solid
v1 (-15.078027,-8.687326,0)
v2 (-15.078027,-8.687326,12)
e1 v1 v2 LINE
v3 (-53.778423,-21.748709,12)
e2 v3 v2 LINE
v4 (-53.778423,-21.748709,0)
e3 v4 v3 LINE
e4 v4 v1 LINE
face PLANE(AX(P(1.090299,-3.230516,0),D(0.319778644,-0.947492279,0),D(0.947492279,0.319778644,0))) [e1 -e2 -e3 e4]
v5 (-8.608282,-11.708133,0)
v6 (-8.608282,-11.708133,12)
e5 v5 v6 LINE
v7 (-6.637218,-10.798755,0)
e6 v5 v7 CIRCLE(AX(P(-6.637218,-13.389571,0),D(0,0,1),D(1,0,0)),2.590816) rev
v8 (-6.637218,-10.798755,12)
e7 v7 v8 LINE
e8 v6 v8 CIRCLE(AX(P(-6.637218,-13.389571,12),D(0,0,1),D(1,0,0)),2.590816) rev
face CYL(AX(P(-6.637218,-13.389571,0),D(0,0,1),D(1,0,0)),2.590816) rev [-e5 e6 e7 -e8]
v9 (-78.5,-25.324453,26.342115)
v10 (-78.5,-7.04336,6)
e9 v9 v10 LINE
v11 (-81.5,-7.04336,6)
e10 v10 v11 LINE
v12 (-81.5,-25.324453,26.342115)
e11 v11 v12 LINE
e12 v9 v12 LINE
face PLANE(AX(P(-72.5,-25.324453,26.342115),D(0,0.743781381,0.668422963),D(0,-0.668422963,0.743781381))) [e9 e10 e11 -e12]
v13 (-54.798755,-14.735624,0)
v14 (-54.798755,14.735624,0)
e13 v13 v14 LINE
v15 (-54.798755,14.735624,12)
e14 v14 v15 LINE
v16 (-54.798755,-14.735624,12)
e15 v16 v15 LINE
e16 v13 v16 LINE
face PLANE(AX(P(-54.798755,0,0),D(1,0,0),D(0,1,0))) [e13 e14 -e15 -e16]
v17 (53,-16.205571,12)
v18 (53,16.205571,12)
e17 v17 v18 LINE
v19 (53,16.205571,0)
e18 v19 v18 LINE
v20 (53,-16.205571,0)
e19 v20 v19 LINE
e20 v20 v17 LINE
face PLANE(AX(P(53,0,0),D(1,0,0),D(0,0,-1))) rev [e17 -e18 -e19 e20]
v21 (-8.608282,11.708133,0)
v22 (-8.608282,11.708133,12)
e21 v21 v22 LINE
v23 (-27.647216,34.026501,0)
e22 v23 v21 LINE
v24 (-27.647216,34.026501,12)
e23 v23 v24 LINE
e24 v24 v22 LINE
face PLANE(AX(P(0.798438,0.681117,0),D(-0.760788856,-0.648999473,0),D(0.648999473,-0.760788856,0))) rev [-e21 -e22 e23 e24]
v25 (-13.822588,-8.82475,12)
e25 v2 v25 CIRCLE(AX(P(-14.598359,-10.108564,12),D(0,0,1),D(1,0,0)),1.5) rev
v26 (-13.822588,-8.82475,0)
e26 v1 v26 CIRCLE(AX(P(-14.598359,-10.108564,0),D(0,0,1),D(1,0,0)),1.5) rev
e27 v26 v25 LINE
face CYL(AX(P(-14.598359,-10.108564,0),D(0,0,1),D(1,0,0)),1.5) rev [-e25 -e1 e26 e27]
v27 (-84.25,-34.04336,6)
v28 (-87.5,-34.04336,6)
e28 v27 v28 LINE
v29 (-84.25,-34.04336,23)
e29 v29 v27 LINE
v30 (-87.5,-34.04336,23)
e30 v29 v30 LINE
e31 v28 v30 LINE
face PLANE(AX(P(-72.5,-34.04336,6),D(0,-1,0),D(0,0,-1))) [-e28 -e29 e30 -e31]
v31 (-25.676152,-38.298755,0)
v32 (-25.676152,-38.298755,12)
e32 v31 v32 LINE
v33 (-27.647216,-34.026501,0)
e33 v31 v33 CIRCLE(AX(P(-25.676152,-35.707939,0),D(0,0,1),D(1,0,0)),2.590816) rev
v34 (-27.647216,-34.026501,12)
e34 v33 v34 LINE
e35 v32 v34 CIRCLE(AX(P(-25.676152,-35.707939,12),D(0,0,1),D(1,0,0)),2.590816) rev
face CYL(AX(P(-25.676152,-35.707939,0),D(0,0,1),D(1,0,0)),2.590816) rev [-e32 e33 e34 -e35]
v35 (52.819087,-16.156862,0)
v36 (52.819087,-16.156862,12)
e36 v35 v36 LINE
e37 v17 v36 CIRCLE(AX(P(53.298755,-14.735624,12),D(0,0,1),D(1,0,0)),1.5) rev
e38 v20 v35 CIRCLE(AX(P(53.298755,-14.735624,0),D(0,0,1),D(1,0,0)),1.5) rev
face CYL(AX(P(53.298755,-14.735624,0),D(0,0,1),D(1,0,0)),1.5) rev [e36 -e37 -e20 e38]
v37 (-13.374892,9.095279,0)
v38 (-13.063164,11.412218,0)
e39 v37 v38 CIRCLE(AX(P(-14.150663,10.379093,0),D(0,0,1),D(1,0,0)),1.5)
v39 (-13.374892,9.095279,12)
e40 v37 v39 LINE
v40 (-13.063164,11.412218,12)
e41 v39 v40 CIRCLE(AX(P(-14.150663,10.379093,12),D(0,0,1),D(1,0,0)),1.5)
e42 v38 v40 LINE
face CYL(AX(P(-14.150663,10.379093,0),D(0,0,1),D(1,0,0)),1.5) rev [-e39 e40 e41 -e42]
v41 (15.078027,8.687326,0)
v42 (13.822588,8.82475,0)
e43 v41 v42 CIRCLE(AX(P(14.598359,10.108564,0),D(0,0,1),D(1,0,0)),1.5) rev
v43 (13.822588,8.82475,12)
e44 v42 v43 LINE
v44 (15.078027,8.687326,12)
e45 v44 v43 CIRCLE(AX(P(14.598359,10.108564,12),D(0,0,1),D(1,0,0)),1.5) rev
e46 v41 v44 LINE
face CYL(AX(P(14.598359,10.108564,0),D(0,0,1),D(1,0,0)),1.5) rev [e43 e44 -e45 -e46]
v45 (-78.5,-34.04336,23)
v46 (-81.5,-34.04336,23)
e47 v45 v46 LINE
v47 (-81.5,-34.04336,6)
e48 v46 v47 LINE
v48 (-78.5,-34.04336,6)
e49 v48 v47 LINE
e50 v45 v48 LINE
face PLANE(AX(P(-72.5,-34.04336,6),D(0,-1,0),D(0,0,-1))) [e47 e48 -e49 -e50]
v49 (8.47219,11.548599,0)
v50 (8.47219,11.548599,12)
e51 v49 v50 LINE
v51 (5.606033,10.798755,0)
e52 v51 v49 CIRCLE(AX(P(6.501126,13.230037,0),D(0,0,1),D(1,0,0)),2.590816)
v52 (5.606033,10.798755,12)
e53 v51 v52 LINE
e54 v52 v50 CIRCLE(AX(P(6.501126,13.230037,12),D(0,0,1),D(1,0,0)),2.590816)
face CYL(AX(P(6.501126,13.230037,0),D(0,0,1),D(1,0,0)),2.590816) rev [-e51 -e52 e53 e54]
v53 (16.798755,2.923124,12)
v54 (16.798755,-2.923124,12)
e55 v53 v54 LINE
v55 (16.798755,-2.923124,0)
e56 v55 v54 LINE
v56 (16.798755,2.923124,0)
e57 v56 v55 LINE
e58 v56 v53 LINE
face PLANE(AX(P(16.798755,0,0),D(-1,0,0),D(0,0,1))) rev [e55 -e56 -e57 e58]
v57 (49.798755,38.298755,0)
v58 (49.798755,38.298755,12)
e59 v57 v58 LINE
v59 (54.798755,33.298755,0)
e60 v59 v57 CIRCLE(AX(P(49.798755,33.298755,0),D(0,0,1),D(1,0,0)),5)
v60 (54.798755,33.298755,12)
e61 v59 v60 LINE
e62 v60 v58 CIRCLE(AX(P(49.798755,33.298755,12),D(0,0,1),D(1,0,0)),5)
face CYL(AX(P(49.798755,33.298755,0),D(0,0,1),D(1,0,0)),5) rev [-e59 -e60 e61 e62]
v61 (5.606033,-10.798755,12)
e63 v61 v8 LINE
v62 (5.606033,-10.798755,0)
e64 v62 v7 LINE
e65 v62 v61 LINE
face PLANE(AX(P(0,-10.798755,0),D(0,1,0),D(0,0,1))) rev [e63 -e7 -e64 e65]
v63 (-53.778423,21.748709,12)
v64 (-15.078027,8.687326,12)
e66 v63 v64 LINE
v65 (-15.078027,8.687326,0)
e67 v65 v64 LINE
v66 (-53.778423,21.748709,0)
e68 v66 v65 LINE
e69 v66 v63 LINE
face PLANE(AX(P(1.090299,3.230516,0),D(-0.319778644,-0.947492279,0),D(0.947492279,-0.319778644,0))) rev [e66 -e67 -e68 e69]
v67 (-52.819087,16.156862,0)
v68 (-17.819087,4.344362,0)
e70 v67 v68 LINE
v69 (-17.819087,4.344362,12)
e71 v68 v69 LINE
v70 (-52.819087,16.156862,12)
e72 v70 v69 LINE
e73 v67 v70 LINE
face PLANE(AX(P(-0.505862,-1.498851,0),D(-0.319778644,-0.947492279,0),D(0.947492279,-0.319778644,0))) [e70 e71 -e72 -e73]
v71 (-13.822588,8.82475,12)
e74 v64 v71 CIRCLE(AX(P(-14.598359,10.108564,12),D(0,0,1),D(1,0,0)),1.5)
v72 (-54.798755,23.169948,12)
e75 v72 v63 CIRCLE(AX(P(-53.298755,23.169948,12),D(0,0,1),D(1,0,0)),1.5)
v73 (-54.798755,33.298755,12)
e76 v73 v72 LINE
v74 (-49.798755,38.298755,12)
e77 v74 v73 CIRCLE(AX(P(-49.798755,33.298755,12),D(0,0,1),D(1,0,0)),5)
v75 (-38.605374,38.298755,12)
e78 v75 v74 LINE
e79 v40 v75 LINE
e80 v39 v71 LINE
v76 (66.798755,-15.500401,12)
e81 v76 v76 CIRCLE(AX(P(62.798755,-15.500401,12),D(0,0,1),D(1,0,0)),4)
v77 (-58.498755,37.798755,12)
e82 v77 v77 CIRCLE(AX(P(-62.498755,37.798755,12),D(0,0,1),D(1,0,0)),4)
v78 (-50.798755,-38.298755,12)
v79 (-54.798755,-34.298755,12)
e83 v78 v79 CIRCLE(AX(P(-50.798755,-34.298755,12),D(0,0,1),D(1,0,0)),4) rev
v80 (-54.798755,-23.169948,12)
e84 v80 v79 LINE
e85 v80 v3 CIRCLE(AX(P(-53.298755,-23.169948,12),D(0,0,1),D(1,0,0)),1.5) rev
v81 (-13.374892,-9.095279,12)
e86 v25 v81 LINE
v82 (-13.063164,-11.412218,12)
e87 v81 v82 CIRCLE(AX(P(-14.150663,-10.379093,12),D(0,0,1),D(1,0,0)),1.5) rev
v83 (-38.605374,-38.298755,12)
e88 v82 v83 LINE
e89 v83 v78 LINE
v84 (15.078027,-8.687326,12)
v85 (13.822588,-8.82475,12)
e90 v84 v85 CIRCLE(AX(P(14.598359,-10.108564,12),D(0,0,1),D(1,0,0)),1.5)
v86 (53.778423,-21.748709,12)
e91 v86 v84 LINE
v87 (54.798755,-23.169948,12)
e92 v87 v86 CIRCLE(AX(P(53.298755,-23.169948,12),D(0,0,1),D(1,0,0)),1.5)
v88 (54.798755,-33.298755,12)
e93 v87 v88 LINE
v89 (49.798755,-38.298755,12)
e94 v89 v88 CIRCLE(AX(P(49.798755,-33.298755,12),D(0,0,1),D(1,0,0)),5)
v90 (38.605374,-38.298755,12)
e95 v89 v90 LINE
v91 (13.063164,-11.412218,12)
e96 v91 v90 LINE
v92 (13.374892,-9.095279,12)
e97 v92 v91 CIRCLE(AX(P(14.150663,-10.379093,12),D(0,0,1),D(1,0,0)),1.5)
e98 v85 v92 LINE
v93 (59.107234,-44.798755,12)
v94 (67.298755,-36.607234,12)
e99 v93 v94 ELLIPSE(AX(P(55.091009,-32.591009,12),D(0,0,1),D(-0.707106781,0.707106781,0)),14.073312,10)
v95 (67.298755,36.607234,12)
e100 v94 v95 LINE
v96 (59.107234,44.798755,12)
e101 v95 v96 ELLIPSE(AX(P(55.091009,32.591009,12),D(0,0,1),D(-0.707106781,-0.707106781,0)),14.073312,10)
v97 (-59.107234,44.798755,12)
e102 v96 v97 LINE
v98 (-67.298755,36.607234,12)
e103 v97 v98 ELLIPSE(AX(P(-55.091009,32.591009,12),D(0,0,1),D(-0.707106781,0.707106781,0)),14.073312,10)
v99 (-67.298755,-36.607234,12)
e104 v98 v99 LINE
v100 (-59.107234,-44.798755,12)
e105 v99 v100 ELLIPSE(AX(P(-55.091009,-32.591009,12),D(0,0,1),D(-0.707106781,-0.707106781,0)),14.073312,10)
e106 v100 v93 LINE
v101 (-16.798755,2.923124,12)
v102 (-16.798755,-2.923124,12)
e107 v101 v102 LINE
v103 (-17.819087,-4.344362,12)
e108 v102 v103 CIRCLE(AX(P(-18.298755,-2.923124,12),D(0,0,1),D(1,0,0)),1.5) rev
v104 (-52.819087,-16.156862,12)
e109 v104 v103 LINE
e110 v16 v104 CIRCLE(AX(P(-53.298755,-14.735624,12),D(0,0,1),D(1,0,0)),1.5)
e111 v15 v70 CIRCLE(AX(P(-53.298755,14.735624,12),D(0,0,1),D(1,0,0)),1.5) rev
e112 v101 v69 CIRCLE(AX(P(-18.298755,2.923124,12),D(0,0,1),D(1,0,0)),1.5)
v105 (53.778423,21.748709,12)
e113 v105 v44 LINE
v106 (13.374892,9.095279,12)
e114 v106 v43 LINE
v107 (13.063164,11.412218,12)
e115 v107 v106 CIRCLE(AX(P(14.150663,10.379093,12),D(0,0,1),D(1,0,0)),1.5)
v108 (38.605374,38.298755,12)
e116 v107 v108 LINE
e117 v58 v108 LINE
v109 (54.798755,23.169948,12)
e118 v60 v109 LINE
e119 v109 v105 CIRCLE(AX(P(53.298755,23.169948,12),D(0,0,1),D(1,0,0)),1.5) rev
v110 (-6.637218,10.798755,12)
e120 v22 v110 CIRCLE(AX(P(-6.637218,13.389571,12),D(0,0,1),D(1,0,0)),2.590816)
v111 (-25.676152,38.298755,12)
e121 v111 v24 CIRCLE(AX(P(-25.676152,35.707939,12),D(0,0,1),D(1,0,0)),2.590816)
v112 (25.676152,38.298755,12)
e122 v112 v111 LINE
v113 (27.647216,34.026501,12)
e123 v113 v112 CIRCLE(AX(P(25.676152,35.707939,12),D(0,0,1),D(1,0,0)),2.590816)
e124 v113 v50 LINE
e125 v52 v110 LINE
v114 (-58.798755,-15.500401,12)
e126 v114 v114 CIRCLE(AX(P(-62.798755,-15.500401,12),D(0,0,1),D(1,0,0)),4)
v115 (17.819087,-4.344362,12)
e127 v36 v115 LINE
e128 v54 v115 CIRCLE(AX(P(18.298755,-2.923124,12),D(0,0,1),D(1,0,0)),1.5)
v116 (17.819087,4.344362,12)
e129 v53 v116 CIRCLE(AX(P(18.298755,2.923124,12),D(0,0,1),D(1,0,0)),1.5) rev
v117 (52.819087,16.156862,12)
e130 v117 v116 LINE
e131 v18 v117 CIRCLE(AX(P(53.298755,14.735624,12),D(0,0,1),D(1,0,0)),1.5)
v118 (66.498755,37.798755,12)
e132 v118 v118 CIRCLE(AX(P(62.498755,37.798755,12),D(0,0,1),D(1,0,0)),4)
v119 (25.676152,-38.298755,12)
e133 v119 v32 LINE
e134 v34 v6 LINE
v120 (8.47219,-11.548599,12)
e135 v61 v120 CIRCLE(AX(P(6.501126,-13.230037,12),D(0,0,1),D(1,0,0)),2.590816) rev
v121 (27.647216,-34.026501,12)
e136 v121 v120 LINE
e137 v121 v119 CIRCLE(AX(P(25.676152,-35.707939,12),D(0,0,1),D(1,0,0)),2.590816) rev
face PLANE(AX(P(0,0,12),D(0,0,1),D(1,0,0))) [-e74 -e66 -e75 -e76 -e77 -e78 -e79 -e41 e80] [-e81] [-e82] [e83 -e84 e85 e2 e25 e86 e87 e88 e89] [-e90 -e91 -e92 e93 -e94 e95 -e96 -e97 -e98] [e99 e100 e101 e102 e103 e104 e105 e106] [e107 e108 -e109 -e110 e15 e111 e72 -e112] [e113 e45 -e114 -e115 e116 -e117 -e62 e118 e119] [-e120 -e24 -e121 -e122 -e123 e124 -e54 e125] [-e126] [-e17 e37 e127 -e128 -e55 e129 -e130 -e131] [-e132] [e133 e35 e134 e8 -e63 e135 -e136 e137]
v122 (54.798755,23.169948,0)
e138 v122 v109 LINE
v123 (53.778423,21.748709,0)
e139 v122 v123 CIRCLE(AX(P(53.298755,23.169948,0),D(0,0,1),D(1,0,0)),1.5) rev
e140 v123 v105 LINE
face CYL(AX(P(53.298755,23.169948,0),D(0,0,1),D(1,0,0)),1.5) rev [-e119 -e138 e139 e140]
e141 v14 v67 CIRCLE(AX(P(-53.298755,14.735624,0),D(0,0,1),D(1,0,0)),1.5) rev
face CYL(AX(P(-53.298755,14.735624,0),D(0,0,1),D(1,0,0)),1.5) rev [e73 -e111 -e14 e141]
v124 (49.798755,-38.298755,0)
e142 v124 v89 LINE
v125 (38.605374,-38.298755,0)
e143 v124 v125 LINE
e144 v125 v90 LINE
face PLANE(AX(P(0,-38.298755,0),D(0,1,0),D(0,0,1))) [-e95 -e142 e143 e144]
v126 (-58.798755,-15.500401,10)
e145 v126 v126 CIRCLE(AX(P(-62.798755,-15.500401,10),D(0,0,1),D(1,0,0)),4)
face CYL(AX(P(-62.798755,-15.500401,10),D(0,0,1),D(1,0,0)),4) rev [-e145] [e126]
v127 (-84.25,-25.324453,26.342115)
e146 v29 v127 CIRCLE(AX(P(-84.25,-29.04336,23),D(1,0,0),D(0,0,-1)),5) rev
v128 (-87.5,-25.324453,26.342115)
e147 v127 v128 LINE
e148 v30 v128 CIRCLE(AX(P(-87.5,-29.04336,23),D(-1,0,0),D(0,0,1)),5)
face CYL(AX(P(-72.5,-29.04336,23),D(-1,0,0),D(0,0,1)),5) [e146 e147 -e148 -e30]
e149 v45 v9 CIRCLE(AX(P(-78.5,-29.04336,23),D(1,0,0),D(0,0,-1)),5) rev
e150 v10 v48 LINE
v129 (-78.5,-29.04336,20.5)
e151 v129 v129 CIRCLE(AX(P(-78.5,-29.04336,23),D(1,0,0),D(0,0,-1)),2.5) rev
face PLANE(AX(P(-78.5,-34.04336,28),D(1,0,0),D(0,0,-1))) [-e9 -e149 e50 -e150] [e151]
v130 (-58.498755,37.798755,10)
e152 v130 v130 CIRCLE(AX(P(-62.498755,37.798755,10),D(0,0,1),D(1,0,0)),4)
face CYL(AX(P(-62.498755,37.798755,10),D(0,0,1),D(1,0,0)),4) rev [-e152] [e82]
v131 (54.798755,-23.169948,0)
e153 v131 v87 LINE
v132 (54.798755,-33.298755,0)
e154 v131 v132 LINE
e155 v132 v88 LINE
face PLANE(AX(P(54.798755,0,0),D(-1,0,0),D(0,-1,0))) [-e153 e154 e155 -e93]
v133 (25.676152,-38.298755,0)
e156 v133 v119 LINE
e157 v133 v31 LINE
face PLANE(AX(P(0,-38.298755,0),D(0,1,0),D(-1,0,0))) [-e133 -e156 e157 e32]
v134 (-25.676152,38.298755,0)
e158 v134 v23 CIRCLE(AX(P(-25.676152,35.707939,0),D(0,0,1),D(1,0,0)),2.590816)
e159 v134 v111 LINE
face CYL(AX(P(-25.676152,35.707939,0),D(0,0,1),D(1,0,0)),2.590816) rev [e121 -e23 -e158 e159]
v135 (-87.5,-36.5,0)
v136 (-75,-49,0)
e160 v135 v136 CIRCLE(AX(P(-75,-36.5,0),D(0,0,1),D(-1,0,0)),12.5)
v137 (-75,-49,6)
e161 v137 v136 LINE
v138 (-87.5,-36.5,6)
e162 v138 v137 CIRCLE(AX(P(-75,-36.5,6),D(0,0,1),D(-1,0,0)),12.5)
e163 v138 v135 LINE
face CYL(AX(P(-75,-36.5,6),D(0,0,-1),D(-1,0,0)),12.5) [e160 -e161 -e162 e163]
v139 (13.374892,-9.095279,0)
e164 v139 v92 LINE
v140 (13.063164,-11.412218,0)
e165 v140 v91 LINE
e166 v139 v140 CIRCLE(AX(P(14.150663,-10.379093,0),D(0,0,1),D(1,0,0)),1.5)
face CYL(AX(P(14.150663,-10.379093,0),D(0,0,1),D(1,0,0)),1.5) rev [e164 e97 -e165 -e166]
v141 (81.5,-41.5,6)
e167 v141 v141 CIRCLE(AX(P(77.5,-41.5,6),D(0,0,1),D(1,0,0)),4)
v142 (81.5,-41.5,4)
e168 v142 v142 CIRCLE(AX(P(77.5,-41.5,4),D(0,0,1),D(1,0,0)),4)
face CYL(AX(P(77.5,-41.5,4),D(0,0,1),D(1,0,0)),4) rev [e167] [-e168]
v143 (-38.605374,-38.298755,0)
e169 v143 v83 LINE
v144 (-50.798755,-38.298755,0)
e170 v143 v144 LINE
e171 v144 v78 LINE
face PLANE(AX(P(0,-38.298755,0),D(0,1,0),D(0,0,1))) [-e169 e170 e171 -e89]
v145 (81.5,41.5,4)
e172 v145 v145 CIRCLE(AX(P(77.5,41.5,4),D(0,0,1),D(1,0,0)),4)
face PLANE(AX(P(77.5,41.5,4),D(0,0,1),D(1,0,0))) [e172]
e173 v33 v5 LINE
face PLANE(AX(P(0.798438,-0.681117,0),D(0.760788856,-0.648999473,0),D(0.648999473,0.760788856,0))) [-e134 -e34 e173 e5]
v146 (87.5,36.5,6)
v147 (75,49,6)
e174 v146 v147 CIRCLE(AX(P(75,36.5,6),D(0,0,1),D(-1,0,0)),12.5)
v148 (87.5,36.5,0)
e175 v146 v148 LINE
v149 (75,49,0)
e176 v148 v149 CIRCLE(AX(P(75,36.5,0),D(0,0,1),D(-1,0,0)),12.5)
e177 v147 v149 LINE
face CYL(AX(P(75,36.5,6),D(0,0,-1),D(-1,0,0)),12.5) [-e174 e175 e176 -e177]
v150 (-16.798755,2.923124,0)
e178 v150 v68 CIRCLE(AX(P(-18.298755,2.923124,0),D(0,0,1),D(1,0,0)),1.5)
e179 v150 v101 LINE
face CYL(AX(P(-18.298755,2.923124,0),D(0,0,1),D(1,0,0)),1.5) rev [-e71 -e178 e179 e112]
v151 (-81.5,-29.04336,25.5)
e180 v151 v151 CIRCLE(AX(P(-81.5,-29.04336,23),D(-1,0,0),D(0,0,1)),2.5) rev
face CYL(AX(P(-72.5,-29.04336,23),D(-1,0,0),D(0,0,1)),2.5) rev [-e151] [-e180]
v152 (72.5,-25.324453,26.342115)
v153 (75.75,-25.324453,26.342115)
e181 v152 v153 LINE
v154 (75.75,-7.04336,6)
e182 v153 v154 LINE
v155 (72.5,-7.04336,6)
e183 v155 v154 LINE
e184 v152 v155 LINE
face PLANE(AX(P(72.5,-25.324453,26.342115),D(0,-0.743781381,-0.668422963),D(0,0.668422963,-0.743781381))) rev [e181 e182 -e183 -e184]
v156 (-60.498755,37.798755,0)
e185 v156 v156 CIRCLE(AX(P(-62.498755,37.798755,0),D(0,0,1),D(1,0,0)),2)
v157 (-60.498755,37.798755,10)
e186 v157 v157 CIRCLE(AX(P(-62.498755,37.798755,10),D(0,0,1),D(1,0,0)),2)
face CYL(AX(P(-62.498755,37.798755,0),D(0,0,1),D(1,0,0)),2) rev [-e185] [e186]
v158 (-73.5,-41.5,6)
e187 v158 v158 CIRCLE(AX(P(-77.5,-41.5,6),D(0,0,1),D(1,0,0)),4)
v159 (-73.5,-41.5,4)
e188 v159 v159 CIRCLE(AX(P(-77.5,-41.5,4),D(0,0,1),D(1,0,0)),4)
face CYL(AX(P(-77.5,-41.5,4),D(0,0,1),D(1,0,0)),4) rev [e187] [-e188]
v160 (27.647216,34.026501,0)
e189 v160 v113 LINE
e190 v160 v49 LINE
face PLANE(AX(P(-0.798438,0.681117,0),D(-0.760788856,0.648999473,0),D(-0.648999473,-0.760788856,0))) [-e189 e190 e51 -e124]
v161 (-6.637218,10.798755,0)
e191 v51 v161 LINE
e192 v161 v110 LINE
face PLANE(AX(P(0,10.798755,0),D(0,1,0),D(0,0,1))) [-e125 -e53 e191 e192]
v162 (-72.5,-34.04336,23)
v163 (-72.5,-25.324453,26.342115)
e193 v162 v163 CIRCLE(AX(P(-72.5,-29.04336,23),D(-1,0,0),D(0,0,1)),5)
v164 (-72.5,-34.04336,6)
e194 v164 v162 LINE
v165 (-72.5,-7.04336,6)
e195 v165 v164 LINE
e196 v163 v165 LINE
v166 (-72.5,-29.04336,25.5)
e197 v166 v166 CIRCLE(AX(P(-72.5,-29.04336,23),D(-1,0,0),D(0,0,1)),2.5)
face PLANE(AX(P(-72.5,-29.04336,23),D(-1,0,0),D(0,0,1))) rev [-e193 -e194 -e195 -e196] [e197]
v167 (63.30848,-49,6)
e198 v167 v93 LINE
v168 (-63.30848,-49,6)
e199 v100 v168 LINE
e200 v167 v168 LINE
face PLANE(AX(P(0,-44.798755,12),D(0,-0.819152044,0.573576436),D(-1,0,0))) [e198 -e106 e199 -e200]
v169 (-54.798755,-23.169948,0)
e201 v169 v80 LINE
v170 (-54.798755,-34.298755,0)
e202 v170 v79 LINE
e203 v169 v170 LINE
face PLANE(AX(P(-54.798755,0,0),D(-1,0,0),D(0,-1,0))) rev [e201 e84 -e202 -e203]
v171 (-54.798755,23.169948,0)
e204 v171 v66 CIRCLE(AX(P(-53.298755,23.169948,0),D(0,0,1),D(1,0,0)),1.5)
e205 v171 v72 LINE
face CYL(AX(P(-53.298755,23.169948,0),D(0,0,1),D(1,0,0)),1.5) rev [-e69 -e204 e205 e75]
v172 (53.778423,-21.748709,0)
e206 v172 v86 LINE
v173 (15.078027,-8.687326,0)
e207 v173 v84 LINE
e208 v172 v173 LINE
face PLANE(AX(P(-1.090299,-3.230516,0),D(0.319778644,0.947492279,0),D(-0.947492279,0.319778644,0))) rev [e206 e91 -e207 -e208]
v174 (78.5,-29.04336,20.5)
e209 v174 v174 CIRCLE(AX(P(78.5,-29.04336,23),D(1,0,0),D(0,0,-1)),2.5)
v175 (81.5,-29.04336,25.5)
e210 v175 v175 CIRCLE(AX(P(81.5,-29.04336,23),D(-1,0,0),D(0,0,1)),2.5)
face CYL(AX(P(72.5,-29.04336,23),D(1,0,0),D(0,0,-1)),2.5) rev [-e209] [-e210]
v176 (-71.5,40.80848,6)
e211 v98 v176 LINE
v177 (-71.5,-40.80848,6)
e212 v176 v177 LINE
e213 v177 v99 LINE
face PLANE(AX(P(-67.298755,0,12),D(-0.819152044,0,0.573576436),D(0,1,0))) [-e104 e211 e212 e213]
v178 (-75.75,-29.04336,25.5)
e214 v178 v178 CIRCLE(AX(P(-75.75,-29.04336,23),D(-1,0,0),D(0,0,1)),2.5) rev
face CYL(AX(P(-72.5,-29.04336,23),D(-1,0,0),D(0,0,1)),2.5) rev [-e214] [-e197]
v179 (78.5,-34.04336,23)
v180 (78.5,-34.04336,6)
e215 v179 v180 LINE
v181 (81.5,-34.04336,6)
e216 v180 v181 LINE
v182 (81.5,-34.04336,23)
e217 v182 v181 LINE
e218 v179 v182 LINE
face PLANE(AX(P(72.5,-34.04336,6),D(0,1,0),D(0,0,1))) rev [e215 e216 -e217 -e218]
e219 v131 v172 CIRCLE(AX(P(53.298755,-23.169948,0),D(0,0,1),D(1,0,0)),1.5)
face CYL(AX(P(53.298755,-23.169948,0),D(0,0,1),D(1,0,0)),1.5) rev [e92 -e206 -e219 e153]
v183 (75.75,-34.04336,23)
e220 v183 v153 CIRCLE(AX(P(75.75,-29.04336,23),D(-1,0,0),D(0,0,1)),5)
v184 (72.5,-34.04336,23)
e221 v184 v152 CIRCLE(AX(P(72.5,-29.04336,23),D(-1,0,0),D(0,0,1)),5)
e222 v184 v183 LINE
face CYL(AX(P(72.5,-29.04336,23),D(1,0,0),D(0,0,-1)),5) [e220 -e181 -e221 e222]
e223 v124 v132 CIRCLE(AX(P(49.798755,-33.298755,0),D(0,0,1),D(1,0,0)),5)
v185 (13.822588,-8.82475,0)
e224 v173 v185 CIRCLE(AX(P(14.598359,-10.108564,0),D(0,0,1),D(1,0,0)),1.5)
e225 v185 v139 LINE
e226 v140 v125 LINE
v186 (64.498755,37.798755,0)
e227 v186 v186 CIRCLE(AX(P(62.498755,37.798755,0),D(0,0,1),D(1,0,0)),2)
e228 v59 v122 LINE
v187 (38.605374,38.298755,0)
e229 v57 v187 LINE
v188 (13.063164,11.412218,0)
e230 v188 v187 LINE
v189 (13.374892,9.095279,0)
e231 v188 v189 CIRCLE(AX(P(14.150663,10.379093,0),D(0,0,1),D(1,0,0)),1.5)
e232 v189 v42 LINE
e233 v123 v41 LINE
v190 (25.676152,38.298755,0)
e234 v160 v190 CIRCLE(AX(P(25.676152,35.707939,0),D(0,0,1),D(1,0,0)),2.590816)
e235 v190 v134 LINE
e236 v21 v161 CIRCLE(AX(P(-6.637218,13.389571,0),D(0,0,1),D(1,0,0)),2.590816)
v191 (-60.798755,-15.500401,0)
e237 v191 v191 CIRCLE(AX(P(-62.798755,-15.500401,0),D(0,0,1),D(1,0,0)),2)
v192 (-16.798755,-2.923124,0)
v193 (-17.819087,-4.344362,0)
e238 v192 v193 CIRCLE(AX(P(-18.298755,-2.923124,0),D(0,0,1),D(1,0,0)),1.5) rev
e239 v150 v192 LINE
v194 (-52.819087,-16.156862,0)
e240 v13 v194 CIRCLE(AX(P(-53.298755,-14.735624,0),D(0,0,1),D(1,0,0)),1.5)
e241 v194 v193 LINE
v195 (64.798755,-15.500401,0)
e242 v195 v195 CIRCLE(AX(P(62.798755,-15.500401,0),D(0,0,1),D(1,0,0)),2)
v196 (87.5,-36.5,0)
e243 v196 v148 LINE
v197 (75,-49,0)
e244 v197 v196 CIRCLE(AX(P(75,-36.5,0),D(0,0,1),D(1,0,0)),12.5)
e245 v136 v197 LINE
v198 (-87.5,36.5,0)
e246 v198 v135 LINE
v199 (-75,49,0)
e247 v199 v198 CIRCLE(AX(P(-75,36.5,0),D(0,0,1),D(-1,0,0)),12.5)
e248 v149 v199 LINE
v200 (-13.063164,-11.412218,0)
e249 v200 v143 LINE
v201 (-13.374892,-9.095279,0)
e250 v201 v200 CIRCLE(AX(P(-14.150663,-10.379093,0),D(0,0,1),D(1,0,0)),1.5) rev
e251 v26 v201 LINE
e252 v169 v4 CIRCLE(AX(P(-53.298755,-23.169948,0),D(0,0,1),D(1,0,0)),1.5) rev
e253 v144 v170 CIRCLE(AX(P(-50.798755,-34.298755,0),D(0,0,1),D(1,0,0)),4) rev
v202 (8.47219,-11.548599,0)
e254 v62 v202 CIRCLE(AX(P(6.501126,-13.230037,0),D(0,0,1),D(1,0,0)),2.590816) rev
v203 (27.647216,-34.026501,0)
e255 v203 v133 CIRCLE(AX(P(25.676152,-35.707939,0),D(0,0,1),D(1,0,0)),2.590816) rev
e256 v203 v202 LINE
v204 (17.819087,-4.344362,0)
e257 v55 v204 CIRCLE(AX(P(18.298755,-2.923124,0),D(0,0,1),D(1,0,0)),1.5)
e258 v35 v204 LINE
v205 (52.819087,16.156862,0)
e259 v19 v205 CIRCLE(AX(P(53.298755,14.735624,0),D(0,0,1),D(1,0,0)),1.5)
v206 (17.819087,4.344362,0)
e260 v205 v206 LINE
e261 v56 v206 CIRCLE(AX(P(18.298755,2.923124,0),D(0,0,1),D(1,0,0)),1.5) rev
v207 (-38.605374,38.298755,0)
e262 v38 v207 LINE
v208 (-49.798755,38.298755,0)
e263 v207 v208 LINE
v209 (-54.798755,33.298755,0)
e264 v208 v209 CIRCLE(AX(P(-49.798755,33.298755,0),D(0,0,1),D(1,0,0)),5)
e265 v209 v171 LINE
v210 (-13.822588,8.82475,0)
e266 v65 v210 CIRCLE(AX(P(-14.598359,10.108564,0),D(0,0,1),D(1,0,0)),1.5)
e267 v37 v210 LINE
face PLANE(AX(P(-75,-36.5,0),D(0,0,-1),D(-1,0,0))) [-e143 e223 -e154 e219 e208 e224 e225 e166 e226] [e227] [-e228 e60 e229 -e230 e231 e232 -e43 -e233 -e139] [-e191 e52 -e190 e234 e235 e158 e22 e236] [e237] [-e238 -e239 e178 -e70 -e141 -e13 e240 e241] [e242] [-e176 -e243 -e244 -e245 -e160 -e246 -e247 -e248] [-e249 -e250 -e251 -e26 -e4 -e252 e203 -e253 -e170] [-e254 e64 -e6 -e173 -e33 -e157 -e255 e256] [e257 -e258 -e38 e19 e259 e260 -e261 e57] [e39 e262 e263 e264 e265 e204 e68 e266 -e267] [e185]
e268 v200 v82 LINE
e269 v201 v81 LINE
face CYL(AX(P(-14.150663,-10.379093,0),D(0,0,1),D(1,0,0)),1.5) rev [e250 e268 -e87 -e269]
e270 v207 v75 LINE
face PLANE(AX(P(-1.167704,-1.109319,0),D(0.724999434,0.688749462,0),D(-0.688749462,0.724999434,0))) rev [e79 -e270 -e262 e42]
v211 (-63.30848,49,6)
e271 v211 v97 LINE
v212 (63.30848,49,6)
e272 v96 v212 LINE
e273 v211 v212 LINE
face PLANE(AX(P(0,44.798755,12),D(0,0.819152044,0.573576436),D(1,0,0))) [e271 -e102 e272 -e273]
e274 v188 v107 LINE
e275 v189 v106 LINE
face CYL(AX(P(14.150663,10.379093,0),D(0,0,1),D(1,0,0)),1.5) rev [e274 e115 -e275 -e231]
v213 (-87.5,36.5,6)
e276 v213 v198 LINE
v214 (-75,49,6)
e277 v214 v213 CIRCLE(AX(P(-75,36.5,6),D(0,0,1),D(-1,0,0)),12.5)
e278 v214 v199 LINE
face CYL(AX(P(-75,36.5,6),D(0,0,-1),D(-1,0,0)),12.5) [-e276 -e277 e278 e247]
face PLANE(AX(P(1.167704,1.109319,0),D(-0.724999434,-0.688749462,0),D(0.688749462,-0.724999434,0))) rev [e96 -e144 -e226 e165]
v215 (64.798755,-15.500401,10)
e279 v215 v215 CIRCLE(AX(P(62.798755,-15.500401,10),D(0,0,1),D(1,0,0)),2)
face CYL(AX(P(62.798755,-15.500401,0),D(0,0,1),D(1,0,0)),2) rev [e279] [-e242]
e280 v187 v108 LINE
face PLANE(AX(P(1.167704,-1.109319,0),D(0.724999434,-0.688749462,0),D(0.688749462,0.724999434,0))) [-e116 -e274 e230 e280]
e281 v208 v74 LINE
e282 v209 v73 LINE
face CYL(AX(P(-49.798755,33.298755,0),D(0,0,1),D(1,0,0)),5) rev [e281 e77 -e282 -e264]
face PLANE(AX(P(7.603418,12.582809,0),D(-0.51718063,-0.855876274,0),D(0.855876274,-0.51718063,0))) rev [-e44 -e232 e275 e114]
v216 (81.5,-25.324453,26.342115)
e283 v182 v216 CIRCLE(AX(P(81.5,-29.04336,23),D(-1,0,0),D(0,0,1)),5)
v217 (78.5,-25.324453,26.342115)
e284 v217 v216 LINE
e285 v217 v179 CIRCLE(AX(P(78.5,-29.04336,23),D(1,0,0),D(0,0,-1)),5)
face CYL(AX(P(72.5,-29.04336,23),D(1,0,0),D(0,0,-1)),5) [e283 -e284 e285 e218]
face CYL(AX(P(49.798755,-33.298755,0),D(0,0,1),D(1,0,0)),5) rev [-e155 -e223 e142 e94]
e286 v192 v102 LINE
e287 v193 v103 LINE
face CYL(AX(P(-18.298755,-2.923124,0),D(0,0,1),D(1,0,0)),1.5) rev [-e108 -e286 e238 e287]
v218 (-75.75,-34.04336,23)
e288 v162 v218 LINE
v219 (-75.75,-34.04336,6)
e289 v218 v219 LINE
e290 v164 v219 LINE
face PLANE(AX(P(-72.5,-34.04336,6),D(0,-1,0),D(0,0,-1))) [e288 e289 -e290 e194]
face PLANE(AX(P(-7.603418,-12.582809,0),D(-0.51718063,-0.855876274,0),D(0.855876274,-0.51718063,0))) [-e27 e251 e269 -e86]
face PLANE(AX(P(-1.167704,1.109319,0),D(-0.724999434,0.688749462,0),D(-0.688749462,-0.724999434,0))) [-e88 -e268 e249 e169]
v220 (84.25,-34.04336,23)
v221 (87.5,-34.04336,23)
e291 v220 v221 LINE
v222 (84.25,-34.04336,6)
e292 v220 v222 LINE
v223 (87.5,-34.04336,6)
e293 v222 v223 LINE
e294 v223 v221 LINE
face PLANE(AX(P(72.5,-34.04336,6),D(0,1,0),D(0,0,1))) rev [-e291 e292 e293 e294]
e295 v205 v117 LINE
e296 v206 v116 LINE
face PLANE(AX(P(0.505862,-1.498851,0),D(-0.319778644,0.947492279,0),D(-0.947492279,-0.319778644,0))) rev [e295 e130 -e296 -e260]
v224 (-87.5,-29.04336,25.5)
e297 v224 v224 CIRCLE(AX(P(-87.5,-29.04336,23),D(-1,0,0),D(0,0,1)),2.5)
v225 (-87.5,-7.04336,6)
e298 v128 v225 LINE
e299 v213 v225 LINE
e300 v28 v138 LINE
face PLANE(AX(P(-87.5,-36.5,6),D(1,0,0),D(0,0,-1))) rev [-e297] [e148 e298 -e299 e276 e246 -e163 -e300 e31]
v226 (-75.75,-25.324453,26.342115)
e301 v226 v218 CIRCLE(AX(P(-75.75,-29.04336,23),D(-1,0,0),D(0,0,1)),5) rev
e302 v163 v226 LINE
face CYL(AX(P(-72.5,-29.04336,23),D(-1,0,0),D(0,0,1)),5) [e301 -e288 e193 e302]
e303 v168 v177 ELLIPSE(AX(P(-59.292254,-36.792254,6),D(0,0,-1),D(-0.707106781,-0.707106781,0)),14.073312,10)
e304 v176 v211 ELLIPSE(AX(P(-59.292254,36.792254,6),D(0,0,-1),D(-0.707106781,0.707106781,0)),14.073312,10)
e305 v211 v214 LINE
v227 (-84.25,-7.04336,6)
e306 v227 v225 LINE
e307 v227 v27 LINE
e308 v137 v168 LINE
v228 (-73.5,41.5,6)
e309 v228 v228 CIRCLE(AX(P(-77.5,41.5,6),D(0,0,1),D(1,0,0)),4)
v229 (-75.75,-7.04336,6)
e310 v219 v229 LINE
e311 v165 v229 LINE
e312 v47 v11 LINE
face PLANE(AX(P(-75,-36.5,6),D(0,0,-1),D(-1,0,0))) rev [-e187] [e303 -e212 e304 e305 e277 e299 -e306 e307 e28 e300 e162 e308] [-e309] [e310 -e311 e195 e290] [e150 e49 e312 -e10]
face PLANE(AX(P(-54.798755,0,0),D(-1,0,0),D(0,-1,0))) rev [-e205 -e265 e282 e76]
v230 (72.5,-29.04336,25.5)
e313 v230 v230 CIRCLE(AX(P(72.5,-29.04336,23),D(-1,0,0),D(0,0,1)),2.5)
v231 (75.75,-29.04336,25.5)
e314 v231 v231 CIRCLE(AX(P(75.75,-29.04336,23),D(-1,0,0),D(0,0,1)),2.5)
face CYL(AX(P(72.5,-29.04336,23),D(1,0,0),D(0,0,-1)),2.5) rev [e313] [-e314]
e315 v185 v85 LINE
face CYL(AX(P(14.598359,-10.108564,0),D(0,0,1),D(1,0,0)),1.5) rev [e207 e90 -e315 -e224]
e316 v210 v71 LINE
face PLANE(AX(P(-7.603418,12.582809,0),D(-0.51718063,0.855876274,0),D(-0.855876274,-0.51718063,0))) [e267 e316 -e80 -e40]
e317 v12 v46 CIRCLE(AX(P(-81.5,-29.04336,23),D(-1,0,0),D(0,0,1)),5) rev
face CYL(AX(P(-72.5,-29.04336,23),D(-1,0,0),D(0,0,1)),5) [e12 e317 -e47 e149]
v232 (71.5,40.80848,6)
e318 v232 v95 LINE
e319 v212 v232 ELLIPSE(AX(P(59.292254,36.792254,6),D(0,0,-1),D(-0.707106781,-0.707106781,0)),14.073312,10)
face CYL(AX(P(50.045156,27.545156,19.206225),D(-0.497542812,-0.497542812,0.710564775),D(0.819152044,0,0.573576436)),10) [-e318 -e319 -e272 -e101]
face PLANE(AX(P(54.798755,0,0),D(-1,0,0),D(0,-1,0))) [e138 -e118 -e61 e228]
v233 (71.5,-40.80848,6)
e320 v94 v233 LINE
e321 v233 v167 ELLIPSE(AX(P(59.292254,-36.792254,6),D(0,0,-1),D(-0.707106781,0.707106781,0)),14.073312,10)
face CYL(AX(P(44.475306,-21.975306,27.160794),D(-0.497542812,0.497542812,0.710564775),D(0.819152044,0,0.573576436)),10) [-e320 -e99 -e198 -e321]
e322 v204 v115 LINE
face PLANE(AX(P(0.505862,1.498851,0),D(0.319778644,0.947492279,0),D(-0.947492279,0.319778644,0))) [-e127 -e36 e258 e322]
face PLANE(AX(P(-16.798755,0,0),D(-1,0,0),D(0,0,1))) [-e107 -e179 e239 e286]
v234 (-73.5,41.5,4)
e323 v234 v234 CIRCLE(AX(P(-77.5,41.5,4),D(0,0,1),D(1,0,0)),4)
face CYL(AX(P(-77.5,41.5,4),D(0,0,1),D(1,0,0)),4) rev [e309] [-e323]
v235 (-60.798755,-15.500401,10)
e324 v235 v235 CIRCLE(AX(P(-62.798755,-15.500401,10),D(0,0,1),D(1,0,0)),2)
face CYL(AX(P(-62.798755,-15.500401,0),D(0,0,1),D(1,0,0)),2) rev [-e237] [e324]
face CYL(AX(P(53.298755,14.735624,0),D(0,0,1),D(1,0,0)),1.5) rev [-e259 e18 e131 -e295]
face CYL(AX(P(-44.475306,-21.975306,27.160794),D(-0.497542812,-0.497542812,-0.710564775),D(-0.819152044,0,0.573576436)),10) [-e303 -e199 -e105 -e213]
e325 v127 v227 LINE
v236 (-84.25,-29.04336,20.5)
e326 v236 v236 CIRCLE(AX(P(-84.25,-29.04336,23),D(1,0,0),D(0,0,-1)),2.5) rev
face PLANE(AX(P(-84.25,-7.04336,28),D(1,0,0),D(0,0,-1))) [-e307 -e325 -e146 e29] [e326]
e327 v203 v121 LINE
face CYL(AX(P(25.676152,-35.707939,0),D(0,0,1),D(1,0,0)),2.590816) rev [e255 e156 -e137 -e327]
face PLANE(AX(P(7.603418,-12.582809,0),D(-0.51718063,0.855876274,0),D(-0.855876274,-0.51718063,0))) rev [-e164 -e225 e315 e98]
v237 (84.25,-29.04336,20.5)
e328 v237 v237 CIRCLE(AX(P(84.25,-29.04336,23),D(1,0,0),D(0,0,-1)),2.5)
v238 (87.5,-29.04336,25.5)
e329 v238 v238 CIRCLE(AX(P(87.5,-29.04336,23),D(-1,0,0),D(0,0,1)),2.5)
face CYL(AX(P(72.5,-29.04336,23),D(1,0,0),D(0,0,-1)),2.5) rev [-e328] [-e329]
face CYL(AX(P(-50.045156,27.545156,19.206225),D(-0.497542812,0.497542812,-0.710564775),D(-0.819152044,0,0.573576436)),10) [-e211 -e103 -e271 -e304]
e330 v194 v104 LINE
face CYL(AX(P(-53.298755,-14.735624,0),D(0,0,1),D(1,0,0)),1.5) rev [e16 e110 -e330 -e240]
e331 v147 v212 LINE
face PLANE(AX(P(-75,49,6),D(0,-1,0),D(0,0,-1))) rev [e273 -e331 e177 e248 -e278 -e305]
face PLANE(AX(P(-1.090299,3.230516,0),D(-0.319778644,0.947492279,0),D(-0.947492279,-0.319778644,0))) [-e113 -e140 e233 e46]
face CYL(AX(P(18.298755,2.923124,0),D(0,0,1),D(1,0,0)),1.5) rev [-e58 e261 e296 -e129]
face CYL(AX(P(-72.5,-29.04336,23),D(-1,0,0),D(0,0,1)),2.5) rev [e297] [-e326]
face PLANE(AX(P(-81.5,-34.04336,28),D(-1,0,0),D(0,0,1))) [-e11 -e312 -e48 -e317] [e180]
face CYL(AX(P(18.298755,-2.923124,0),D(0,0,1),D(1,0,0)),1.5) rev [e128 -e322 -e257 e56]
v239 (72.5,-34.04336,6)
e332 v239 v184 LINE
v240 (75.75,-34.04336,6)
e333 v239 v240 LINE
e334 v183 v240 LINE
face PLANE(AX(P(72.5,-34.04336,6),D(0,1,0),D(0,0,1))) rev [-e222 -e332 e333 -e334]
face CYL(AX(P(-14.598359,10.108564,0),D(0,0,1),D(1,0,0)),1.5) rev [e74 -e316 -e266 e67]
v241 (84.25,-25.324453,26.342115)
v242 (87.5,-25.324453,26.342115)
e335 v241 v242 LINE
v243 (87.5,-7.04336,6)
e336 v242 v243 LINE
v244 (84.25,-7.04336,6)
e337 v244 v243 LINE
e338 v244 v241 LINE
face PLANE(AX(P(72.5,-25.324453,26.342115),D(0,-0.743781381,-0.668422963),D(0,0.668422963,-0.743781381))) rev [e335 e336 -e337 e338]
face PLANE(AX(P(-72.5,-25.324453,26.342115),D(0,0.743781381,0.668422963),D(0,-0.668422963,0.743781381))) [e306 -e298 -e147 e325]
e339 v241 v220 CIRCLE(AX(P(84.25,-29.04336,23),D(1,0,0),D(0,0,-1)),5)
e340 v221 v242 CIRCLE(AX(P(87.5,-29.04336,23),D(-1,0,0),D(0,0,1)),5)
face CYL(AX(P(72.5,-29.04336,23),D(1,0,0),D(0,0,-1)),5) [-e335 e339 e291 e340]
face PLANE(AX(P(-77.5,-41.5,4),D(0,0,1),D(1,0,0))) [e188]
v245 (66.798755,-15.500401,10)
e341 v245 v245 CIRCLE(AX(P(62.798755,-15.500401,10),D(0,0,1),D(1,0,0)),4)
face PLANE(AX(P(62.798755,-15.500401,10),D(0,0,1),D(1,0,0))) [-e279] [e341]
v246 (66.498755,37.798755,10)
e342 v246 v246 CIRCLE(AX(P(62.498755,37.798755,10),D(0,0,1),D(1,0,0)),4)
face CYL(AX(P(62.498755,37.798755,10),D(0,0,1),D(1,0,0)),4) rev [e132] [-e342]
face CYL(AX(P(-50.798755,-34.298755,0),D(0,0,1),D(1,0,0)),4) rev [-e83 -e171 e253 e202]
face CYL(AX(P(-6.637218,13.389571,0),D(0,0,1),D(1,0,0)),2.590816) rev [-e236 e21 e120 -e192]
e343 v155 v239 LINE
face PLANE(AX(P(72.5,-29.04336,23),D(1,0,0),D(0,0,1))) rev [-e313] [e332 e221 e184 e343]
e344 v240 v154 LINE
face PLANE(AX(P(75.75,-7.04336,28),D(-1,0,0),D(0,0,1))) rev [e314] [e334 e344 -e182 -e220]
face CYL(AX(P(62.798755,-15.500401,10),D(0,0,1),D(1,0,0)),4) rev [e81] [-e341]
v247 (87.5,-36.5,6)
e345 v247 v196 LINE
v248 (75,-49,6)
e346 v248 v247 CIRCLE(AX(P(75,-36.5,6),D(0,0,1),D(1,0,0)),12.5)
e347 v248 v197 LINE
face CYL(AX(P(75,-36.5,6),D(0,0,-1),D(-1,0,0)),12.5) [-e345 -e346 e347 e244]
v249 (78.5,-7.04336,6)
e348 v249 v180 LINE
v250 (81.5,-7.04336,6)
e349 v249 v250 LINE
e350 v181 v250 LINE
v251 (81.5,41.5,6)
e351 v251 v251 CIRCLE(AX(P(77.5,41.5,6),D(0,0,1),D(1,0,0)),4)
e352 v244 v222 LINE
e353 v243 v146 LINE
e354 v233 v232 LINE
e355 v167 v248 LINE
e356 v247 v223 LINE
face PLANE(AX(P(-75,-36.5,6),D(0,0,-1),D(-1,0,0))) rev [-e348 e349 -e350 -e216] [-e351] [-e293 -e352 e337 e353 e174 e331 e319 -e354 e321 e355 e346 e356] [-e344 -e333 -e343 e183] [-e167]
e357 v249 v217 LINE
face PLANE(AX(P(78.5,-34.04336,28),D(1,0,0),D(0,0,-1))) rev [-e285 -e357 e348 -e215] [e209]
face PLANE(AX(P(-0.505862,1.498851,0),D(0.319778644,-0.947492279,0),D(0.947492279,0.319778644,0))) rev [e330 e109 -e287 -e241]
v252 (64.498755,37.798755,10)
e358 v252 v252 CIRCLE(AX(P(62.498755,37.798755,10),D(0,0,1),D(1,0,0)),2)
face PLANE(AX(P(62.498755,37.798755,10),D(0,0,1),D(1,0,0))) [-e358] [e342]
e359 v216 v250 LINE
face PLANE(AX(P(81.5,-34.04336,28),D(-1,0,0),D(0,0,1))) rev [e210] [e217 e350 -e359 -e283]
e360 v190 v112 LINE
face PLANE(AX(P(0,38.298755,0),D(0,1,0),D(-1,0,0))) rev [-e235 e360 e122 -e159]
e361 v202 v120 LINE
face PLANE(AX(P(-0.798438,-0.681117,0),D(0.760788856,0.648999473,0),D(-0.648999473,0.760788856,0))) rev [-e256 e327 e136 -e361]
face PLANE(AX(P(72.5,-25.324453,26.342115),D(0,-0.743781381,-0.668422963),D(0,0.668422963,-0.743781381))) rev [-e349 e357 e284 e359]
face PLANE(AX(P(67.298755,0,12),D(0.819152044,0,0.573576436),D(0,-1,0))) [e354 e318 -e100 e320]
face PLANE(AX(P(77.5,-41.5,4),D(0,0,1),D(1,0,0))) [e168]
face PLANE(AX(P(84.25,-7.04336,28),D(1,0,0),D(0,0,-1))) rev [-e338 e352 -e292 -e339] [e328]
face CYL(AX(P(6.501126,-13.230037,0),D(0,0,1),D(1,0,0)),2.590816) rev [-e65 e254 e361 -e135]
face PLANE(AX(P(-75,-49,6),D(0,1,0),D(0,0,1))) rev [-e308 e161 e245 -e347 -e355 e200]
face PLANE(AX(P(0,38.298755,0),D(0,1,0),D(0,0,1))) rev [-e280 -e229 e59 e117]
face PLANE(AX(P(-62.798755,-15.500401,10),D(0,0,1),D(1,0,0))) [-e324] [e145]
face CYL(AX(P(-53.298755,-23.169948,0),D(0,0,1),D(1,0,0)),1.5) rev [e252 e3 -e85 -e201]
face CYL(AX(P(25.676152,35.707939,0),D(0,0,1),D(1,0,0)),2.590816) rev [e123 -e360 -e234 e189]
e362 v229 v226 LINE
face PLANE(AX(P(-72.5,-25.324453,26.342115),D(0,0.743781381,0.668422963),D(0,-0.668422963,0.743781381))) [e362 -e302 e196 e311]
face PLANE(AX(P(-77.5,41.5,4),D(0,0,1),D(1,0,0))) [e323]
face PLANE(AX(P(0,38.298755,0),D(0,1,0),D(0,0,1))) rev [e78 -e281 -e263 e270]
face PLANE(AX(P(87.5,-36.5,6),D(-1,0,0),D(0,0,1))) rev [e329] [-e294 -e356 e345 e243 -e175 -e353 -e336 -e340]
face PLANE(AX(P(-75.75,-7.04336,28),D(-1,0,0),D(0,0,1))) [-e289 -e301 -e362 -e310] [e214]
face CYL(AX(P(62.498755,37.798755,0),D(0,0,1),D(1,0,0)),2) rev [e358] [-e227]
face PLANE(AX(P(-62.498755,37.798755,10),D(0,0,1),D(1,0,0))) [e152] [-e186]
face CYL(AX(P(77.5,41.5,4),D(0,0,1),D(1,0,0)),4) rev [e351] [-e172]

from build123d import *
from OCP.BRepFilletAPI import BRepFilletAPI_MakeChamfer

# Parameters (mm, degrees)
BOSS_EXTRUDE1_DEPTH = 6
SKETCH2_R           = 4
CUT_EXTRUDE1_DEPTH  = 2
SKETCH3_W           = 143
SKETCH3_H           = 98
BOSS_EXTRUDE2_DEPTH = 6
CHAMFER1_SIZE       = 6
CHAMFER1_SIZE_2     = 4.201245229
FILLET1_R           = 10
CUT_EXTRUDE3_DEPTH  = 102.001237616
SKETCH5_R           = 4
CUT_EXTRUDE4_DEPTH  = 2
SKETCH6_R           = 2
CUT_EXTRUDE5_DEPTH  = 101.783183121
SKETCH7_R           = 2.5
BOSS_EXTRUDE3_DEPTH = 15
SKETCH8_W           = 2.75
SKETCH8_H           = 27
CUT_EXTRUDE7_DEPTH  = 103.670589752


# Some blends are built 0.0001 mm under size
with BuildPart() as part:
    # Sketch1 → Boss-Extrude1 (new body)
    with BuildSketch(Plane.XY):
        with BuildLine():
            Line((-75, -49), (75, -49))
            ThreePointArc((75, -49), (83.838834765, -45.338834765), (87.5, -36.5))
            Line((87.5, -36.5), (87.5, 36.5))
            ThreePointArc((87.5, 36.5), (83.838834765, 45.338834765), (75, 49))
            Line((75, 49), (-75, 49))
            ThreePointArc((-75, 49), (-83.838834765, 45.338834765), (-87.5, 36.5))
            Line((-87.5, 36.5), (-87.5, -36.5))
            ThreePointArc((-87.5, -36.5), (-83.838834765, -45.338834765), (-75, -49))
        make_face()
    extrude(amount=BOSS_EXTRUDE1_DEPTH)

    # Sketch2 → Cut-Extrude1 (cut)
    with BuildSketch(Plane.XY.offset(6)):
        with Locations((-77.5, -41.5)):
            Circle(SKETCH2_R)
        with Locations((-77.5, 41.5)):
            Circle(SKETCH2_R)
        with Locations((77.5, 41.5)):
            Circle(SKETCH2_R)
        with Locations((77.5, -41.5)):
            Circle(SKETCH2_R)
    extrude(amount=-CUT_EXTRUDE1_DEPTH, mode=Mode.SUBTRACT)

    # Sketch3 → Boss-Extrude2 (add)
    with BuildSketch(Plane.XY.offset(6)):
        Rectangle(SKETCH3_W, SKETCH3_H)
    extrude(amount=BOSS_EXTRUDE2_DEPTH)

    # Chamfer1
    chamfer1_edges_1 = [part.edges().sort_by_distance(p)[0] for p in [
        (0, -49, 12),
    ]]
    chamfer1_side_1 = [part.faces().sort_by_distance(p)[0] for p in [
        (0, -49, 11.915975095),
    ]]
    chamfer1_edges_2 = [part.edges().sort_by_distance(p)[0] for p in [
        (71.5, 0, 12),
    ]]
    chamfer1_side_2 = [part.faces().sort_by_distance(p)[0] for p in [
        (71.5, 0, 11.915975095),
    ]]
    chamfer1_edges_3 = [part.edges().sort_by_distance(p)[0] for p in [
        (0, 49, 12),
    ]]
    chamfer1_side_3 = [part.faces().sort_by_distance(p)[0] for p in [
        (0, 49, 11.915975095),
    ]]
    chamfer1_edges_4 = [part.edges().sort_by_distance(p)[0] for p in [
        (-71.5, 0, 12),
    ]]
    chamfer1_side_4 = [part.faces().sort_by_distance(p)[0] for p in [
        (-71.5, 0, 11.915975095),
    ]]
    chamfer1 = BRepFilletAPI_MakeChamfer(part.part.solid().wrapped)
    for e in chamfer1_edges_1:
        chamfer1.Add(CHAMFER1_SIZE - 0.0001, CHAMFER1_SIZE_2 - 0.0001, e.wrapped, chamfer1_side_1[0].wrapped)
    for e in chamfer1_edges_2:
        chamfer1.Add(CHAMFER1_SIZE - 0.0001, CHAMFER1_SIZE_2 - 0.0001, e.wrapped, chamfer1_side_2[0].wrapped)
    for e in chamfer1_edges_3:
        chamfer1.Add(CHAMFER1_SIZE - 0.0001, CHAMFER1_SIZE_2 - 0.0001, e.wrapped, chamfer1_side_3[0].wrapped)
    for e in chamfer1_edges_4:
        chamfer1.Add(CHAMFER1_SIZE - 0.0001, CHAMFER1_SIZE_2 - 0.0001, e.wrapped, chamfer1_side_4[0].wrapped)
    add(Compound.cast(chamfer1.Shape()), mode=Mode.REPLACE)  # a hair under: the kernel refuses the full size

    # Fillet1
    # the kernel refuses this fillet: 10 mm, written as the material it takes off along each edge
    with BuildSketch(Plane(origin=(-80.338409297, 57.838409297, -6.622546695), x_dir=(-0.2853764384321531, -0.8674404497677589, -0.40756270007753115), z_dir=(0.4975410195217164, -0.4975410195217155, 0.7105672858966862))) as fillet1_piece_1_section:
        with BuildLine():
            CenterArc((FILLET1_R * 0.710567285897, FILLET1_R), FILLET1_R, 199.207288567, 70.792711433)
            Line((-FILLET1_R * 0.23376724174, FILLET1_R * 0.671013222281), (0, 0))
            Line((0, 0), (FILLET1_R * 0.710567285897, 0))
        make_face()
    fillet1_piece_1 = extrude(amount=43.972181114, mode=Mode.PRIVATE)
    fillet1_piece_1 = split(fillet1_piece_1, bisect_by=Plane(origin=(-66.037388374, 46.592299242, 6), z_dir=(0, 0, 1)), keep=Keep.TOP, mode=Mode.PRIVATE)
    add(fillet1_piece_1, mode=Mode.SUBTRACT)
    with BuildSketch(Plane(origin=(80.338409297, 57.838409297, -6.622546695), x_dir=(0.28537643843215343, -0.8674404497677589, -0.4075627000775309), z_dir=(-0.4975410195217164, -0.4975410195217155, 0.7105672858966862))) as fillet1_piece_2_section:
        with BuildLine():
            CenterArc((FILLET1_R * 0.710567285897, -FILLET1_R), FILLET1_R, 90, 70.792711433)
            Line((-FILLET1_R * 0.23376724174, -FILLET1_R * 0.671013222281), (0, 0))
            Line((0, 0), (FILLET1_R * 0.710567285897, 0))
        make_face()
    fillet1_piece_2 = extrude(amount=43.972181114, mode=Mode.PRIVATE)
    fillet1_piece_2 = split(fillet1_piece_2, bisect_by=Plane(origin=(66.037388419, 46.592299255, 6), z_dir=(0, 0, 1)), keep=Keep.TOP, mode=Mode.PRIVATE)
    add(fillet1_piece_2, mode=Mode.SUBTRACT)
    with BuildSketch(Plane(origin=(-80.338409297, -57.838409297, -6.622546695), x_dir=(0.8674404497677584, -0.28537643843215443, -0.4075627000775313), z_dir=(0.4975410195217164, 0.4975410195217155, 0.7105672858966862))) as fillet1_piece_3_section:
        with BuildLine():
            CenterArc((FILLET1_R * 0.710567285897, FILLET1_R), FILLET1_R, 199.207288567, 70.792711433)
            Line((-FILLET1_R * 0.23376724174, FILLET1_R * 0.671013222281), (0, 0))
            Line((0, 0), (FILLET1_R * 0.710567285897, 0))
        make_face()
    fillet1_piece_3 = extrude(amount=43.972181114, mode=Mode.PRIVATE)
    fillet1_piece_3 = split(fillet1_piece_3, bisect_by=Plane(origin=(-68.349851216, -44.516567652, 6), z_dir=(0, 0, 1)), keep=Keep.TOP, mode=Mode.PRIVATE)
    add(fillet1_piece_3, mode=Mode.SUBTRACT)
    with BuildSketch(Plane(origin=(80.338409297, -57.838409297, -6.622546695), x_dir=(-0.8674404497677585, -0.285376438432154, -0.40756270007753165), z_dir=(-0.4975410195217164, 0.4975410195217155, 0.7105672858966862))) as fillet1_piece_4_section:
        with BuildLine():
            CenterArc((FILLET1_R * 0.710567285897, -FILLET1_R), FILLET1_R, 90, 70.792711433)
            Line((-FILLET1_R * 0.23376724174, -FILLET1_R * 0.671013222281), (0, 0))
            Line((0, 0), (FILLET1_R * 0.710567285897, 0))
        make_face()
    fillet1_piece_4 = extrude(amount=43.972181114, mode=Mode.PRIVATE)
    fillet1_piece_4 = split(fillet1_piece_4, bisect_by=Plane(origin=(66.037387865, -46.592298857, 6), z_dir=(0, 0, 1)), keep=Keep.TOP, mode=Mode.PRIVATE)
    add(fillet1_piece_4, mode=Mode.SUBTRACT)

    # Sketch4 → Cut-Extrude3 (cut, through all)
    with BuildSketch(Plane.XY.offset(12)):
        with BuildLine():
            Line((38.605374144, -38.298754771), (49.798754771, -38.298754771))
            ThreePointArc((49.798754771, -38.298754771), (53.334288677, -36.834288677), (54.798754771, -33.298754771))
            Line((54.798754771, -33.298754771), (54.798754771, -23.169947538))
            ThreePointArc((54.798754771, -23.169947538), (54.517258351, -22.295162407), (53.778422737, -21.748709119))
            Line((53.778422737, -21.748709119), (15.078026844, -8.687325505))
            ThreePointArc((15.078026844, -8.687325505), (14.435139445, -8.617470561), (13.822587932, -8.824749513))
            Line((13.822587932, -8.824749513), (13.374891952, -9.095278907))
            ThreePointArc((13.374891952, -9.095278907), (12.664057709, -10.179080781), (13.063163747, -11.41221751))
            Line((13.063163747, -11.41221751), (38.605374144, -38.298754771))
        make_face()
        with BuildLine():
            ThreePointArc((52.819086805, -16.156862061), (52.908782166, -16.184043944), (53, -16.205571121))
            Line((53, -16.205571121), (53, 16.205571121))
            ThreePointArc((53, 16.205571121), (52.908782166, 16.184043944), (52.819086805, 16.156862061))
            Line((52.819086805, 16.156862061), (17.819086805, 4.344362061))
            ThreePointArc((17.819086805, 4.344362061), (17.080251191, 3.797908774), (16.798754771, 2.923123643))
            Line((16.798754771, 2.923123643), (16.798754771, -2.923123643))
            ThreePointArc((16.798754771, -2.923123643), (17.080251191, -3.797908774), (17.819086805, -4.344362061))
            Line((17.819086805, -4.344362061), (52.819086805, -16.156862061))
        make_face()
        with BuildLine():
            ThreePointArc((54.798754771, 33.298754771), (53.334288677, 36.834288677), (49.798754771, 38.298754771))
            Line((49.798754771, 38.298754771), (38.605374144, 38.298754771))
            Line((38.605374144, 38.298754771), (13.063163747, 11.41221751))
            ThreePointArc((13.063163747, 11.41221751), (12.664057709, 10.179080781), (13.374891952, 9.095278907))
            Line((13.374891952, 9.095278907), (13.822587932, 8.824749513))
            ThreePointArc((13.822587932, 8.824749513), (14.435139445, 8.617470561), (15.078026844, 8.687325505))
            Line((15.078026844, 8.687325505), (53.778422737, 21.748709119))
            ThreePointArc((53.778422737, 21.748709119), (54.517258351, 22.295162407), (54.798754771, 23.169947538))
            Line((54.798754771, 23.169947538), (54.798754771, 33.298754771))
        make_face()
        with BuildLine():
            Line((-50.798754771, -38.298754771), (-38.605374144, -38.298754771))
            Line((-38.605374144, -38.298754771), (-13.063163747, -11.41221751))
            ThreePointArc((-13.063163747, -11.41221751), (-12.664057709, -10.179080781), (-13.374891952, -9.095278907))
            Line((-13.374891952, -9.095278907), (-13.822587932, -8.824749513))
            ThreePointArc((-13.822587932, -8.824749513), (-14.435139445, -8.617470561), (-15.078026844, -8.687325505))
            Line((-15.078026844, -8.687325505), (-53.778422737, -21.748709119))
            ThreePointArc((-53.778422737, -21.748709119), (-54.517258351, -22.295162407), (-54.798754771, -23.169947538))
            Line((-54.798754771, -23.169947538), (-54.798754771, -34.298754771))
            ThreePointArc((-54.798754771, -34.298754771), (-53.627181895, -37.127181895), (-50.798754771, -38.298754771))
        make_face()
        with BuildLine():
            ThreePointArc((27.647216151, 34.02650079), (28.0286641, 36.793302965), (25.67615232, 38.298754771))
            Line((25.67615232, 38.298754771), (-25.67615232, 38.298754771))
            ThreePointArc((-25.67615232, 38.298754771), (-28.0286641, 36.793302965), (-27.647216151, 34.02650079))
            Line((-27.647216151, 34.02650079), (-8.608281569, 11.708132501))
            ThreePointArc((-8.608281569, 11.708132501), (-7.722581788, 11.037058846), (-6.637217738, 10.798754771))
            Line((-6.637217738, 10.798754771), (5.606032866, 10.798754771))
            ThreePointArc((5.606032866, 10.798754771), (7.156866017, 10.723579297), (8.47218991, 11.548599216))
            Line((8.47218991, 11.548599216), (27.647216151, 34.02650079))
        make_face()
        with BuildLine():
            Line((-16.798754771, -2.923123643), (-16.798754771, 2.923123643))
            ThreePointArc((-16.798754771, 2.923123643), (-17.080251191, 3.797908774), (-17.819086805, 4.344362061))
            Line((-17.819086805, 4.344362061), (-52.819086805, 16.156862061))
            ThreePointArc((-52.819086805, 16.156862061), (-54.173539902, 15.954127223), (-54.798754771, 14.735623643))
            Line((-54.798754771, 14.735623643), (-54.798754771, -14.735623643))
            ThreePointArc((-54.798754771, -14.735623643), (-54.173539902, -15.954127223), (-52.819086805, -16.156862061))
            Line((-52.819086805, -16.156862061), (-17.819086805, -4.344362061))
            ThreePointArc((-17.819086805, -4.344362061), (-17.080251191, -3.797908774), (-16.798754771, -2.923123643))
        make_face()
        with BuildLine():
            ThreePointArc((25.67615232, -38.298754771), (28.0286641, -36.793302965), (27.647216151, -34.02650079))
            Line((27.647216151, -34.02650079), (8.47218991, -11.548599216))
            ThreePointArc((8.47218991, -11.548599216), (7.156866017, -10.723579297), (5.606032866, -10.798754771))
            Line((5.606032866, -10.798754771), (-6.637217738, -10.798754771))
            ThreePointArc((-6.637217738, -10.798754771), (-7.722581788, -11.037058846), (-8.608281569, -11.708132501))
            Line((-8.608281569, -11.708132501), (-27.647216151, -34.02650079))
            ThreePointArc((-27.647216151, -34.02650079), (-28.0286641, -36.793302965), (-25.67615232, -38.298754771))
            Line((-25.67615232, -38.298754771), (25.67615232, -38.298754771))
        make_face()
        with BuildLine():
            Line((-13.063163747, 11.41221751), (-38.605374144, 38.298754771))
            Line((-38.605374144, 38.298754771), (-49.798754771, 38.298754771))
            ThreePointArc((-49.798754771, 38.298754771), (-53.334288677, 36.834288677), (-54.798754771, 33.298754771))
            Line((-54.798754771, 33.298754771), (-54.798754771, 23.169947538))
            ThreePointArc((-54.798754771, 23.169947538), (-54.517258351, 22.295162407), (-53.778422737, 21.748709119))
            Line((-53.778422737, 21.748709119), (-15.078026844, 8.687325505))
            ThreePointArc((-15.078026844, 8.687325505), (-14.435139445, 8.617470561), (-13.822587932, 8.824749513))
            Line((-13.822587932, 8.824749513), (-13.374891952, 9.095278907))
            ThreePointArc((-13.374891952, 9.095278907), (-12.664057709, 10.179080781), (-13.063163747, 11.41221751))
        make_face()
    extrude(amount=-CUT_EXTRUDE3_DEPTH, mode=Mode.SUBTRACT)

    # Sketch5 → Cut-Extrude4 (cut)
    with BuildSketch(Plane.XY.offset(12)):
        with Locations((62.498754771, 37.798754771)):
            Circle(SKETCH5_R)
        with Locations((-62.498754771, 37.798754771)):
            Circle(SKETCH5_R)
        with Locations((62.798754771, -15.500400945)):
            Circle(SKETCH5_R)
        with Locations((-62.798754771, -15.500400945)):
            Circle(SKETCH5_R)
    extrude(amount=-CUT_EXTRUDE4_DEPTH, mode=Mode.SUBTRACT)

    # Sketch6 → Cut-Extrude5 (cut, through all)
    with BuildSketch(Plane.XY.offset(10)):
        with Locations((62.498754771, 37.798754771)):
            Circle(SKETCH6_R)
        with Locations((62.798754771, -15.500400945)):
            Circle(SKETCH6_R)
        with Locations((-62.798754771, -15.500400945)):
            Circle(SKETCH6_R)
        with Locations((-62.498754771, 37.798754771)):
            Circle(SKETCH6_R)
    extrude(amount=-CUT_EXTRUDE5_DEPTH, mode=Mode.SUBTRACT)

    # Sketch7 → Boss-Extrude3 (add)
    with BuildSketch(Plane.ZY.offset(87.5)):
        with BuildLine():
            Line((6, -34.043359763), (23, -34.043359763))
            ThreePointArc((23, -34.043359763), (27.668754358, -30.832977807), (26.342114816, -25.32445286))
            Line((26.342114816, -25.32445286), (6, -7.043359763))
            Line((6, -7.043359763), (6, -34.043359763))
        make_face()
        with Locations((23, -29.043359763)):
            Circle(SKETCH7_R, mode=Mode.SUBTRACT)
    boss_extrude3 = extrude(amount=-BOSS_EXTRUDE3_DEPTH)

    # Sketch8 → Cut-Extrude7 (cut, through all)
    with BuildSketch(Plane.XY.offset(6)):
        with Locations((-82.875, -20.543359763)):
            Rectangle(SKETCH8_W, SKETCH8_H)
        with Locations((-77.125, -20.543359763)):
            Rectangle(SKETCH8_W, SKETCH8_H)
    cut_extrude7 = extrude(amount=CUT_EXTRUDE7_DEPTH, mode=Mode.SUBTRACT)

    # Mirror6: Boss-Extrude3, Cut-Extrude7 across plane
    add(boss_extrude3.mirror(Plane(origin=(0, 0, 0), x_dir=(0, 0, 1), z_dir=(1, 0, 0))))
    add(cut_extrude7.mirror(Plane(origin=(0, 0, 0), x_dir=(0, 0, 1), z_dir=(1, 0, 0))), mode=Mode.SUBTRACT)


solid = part.part
